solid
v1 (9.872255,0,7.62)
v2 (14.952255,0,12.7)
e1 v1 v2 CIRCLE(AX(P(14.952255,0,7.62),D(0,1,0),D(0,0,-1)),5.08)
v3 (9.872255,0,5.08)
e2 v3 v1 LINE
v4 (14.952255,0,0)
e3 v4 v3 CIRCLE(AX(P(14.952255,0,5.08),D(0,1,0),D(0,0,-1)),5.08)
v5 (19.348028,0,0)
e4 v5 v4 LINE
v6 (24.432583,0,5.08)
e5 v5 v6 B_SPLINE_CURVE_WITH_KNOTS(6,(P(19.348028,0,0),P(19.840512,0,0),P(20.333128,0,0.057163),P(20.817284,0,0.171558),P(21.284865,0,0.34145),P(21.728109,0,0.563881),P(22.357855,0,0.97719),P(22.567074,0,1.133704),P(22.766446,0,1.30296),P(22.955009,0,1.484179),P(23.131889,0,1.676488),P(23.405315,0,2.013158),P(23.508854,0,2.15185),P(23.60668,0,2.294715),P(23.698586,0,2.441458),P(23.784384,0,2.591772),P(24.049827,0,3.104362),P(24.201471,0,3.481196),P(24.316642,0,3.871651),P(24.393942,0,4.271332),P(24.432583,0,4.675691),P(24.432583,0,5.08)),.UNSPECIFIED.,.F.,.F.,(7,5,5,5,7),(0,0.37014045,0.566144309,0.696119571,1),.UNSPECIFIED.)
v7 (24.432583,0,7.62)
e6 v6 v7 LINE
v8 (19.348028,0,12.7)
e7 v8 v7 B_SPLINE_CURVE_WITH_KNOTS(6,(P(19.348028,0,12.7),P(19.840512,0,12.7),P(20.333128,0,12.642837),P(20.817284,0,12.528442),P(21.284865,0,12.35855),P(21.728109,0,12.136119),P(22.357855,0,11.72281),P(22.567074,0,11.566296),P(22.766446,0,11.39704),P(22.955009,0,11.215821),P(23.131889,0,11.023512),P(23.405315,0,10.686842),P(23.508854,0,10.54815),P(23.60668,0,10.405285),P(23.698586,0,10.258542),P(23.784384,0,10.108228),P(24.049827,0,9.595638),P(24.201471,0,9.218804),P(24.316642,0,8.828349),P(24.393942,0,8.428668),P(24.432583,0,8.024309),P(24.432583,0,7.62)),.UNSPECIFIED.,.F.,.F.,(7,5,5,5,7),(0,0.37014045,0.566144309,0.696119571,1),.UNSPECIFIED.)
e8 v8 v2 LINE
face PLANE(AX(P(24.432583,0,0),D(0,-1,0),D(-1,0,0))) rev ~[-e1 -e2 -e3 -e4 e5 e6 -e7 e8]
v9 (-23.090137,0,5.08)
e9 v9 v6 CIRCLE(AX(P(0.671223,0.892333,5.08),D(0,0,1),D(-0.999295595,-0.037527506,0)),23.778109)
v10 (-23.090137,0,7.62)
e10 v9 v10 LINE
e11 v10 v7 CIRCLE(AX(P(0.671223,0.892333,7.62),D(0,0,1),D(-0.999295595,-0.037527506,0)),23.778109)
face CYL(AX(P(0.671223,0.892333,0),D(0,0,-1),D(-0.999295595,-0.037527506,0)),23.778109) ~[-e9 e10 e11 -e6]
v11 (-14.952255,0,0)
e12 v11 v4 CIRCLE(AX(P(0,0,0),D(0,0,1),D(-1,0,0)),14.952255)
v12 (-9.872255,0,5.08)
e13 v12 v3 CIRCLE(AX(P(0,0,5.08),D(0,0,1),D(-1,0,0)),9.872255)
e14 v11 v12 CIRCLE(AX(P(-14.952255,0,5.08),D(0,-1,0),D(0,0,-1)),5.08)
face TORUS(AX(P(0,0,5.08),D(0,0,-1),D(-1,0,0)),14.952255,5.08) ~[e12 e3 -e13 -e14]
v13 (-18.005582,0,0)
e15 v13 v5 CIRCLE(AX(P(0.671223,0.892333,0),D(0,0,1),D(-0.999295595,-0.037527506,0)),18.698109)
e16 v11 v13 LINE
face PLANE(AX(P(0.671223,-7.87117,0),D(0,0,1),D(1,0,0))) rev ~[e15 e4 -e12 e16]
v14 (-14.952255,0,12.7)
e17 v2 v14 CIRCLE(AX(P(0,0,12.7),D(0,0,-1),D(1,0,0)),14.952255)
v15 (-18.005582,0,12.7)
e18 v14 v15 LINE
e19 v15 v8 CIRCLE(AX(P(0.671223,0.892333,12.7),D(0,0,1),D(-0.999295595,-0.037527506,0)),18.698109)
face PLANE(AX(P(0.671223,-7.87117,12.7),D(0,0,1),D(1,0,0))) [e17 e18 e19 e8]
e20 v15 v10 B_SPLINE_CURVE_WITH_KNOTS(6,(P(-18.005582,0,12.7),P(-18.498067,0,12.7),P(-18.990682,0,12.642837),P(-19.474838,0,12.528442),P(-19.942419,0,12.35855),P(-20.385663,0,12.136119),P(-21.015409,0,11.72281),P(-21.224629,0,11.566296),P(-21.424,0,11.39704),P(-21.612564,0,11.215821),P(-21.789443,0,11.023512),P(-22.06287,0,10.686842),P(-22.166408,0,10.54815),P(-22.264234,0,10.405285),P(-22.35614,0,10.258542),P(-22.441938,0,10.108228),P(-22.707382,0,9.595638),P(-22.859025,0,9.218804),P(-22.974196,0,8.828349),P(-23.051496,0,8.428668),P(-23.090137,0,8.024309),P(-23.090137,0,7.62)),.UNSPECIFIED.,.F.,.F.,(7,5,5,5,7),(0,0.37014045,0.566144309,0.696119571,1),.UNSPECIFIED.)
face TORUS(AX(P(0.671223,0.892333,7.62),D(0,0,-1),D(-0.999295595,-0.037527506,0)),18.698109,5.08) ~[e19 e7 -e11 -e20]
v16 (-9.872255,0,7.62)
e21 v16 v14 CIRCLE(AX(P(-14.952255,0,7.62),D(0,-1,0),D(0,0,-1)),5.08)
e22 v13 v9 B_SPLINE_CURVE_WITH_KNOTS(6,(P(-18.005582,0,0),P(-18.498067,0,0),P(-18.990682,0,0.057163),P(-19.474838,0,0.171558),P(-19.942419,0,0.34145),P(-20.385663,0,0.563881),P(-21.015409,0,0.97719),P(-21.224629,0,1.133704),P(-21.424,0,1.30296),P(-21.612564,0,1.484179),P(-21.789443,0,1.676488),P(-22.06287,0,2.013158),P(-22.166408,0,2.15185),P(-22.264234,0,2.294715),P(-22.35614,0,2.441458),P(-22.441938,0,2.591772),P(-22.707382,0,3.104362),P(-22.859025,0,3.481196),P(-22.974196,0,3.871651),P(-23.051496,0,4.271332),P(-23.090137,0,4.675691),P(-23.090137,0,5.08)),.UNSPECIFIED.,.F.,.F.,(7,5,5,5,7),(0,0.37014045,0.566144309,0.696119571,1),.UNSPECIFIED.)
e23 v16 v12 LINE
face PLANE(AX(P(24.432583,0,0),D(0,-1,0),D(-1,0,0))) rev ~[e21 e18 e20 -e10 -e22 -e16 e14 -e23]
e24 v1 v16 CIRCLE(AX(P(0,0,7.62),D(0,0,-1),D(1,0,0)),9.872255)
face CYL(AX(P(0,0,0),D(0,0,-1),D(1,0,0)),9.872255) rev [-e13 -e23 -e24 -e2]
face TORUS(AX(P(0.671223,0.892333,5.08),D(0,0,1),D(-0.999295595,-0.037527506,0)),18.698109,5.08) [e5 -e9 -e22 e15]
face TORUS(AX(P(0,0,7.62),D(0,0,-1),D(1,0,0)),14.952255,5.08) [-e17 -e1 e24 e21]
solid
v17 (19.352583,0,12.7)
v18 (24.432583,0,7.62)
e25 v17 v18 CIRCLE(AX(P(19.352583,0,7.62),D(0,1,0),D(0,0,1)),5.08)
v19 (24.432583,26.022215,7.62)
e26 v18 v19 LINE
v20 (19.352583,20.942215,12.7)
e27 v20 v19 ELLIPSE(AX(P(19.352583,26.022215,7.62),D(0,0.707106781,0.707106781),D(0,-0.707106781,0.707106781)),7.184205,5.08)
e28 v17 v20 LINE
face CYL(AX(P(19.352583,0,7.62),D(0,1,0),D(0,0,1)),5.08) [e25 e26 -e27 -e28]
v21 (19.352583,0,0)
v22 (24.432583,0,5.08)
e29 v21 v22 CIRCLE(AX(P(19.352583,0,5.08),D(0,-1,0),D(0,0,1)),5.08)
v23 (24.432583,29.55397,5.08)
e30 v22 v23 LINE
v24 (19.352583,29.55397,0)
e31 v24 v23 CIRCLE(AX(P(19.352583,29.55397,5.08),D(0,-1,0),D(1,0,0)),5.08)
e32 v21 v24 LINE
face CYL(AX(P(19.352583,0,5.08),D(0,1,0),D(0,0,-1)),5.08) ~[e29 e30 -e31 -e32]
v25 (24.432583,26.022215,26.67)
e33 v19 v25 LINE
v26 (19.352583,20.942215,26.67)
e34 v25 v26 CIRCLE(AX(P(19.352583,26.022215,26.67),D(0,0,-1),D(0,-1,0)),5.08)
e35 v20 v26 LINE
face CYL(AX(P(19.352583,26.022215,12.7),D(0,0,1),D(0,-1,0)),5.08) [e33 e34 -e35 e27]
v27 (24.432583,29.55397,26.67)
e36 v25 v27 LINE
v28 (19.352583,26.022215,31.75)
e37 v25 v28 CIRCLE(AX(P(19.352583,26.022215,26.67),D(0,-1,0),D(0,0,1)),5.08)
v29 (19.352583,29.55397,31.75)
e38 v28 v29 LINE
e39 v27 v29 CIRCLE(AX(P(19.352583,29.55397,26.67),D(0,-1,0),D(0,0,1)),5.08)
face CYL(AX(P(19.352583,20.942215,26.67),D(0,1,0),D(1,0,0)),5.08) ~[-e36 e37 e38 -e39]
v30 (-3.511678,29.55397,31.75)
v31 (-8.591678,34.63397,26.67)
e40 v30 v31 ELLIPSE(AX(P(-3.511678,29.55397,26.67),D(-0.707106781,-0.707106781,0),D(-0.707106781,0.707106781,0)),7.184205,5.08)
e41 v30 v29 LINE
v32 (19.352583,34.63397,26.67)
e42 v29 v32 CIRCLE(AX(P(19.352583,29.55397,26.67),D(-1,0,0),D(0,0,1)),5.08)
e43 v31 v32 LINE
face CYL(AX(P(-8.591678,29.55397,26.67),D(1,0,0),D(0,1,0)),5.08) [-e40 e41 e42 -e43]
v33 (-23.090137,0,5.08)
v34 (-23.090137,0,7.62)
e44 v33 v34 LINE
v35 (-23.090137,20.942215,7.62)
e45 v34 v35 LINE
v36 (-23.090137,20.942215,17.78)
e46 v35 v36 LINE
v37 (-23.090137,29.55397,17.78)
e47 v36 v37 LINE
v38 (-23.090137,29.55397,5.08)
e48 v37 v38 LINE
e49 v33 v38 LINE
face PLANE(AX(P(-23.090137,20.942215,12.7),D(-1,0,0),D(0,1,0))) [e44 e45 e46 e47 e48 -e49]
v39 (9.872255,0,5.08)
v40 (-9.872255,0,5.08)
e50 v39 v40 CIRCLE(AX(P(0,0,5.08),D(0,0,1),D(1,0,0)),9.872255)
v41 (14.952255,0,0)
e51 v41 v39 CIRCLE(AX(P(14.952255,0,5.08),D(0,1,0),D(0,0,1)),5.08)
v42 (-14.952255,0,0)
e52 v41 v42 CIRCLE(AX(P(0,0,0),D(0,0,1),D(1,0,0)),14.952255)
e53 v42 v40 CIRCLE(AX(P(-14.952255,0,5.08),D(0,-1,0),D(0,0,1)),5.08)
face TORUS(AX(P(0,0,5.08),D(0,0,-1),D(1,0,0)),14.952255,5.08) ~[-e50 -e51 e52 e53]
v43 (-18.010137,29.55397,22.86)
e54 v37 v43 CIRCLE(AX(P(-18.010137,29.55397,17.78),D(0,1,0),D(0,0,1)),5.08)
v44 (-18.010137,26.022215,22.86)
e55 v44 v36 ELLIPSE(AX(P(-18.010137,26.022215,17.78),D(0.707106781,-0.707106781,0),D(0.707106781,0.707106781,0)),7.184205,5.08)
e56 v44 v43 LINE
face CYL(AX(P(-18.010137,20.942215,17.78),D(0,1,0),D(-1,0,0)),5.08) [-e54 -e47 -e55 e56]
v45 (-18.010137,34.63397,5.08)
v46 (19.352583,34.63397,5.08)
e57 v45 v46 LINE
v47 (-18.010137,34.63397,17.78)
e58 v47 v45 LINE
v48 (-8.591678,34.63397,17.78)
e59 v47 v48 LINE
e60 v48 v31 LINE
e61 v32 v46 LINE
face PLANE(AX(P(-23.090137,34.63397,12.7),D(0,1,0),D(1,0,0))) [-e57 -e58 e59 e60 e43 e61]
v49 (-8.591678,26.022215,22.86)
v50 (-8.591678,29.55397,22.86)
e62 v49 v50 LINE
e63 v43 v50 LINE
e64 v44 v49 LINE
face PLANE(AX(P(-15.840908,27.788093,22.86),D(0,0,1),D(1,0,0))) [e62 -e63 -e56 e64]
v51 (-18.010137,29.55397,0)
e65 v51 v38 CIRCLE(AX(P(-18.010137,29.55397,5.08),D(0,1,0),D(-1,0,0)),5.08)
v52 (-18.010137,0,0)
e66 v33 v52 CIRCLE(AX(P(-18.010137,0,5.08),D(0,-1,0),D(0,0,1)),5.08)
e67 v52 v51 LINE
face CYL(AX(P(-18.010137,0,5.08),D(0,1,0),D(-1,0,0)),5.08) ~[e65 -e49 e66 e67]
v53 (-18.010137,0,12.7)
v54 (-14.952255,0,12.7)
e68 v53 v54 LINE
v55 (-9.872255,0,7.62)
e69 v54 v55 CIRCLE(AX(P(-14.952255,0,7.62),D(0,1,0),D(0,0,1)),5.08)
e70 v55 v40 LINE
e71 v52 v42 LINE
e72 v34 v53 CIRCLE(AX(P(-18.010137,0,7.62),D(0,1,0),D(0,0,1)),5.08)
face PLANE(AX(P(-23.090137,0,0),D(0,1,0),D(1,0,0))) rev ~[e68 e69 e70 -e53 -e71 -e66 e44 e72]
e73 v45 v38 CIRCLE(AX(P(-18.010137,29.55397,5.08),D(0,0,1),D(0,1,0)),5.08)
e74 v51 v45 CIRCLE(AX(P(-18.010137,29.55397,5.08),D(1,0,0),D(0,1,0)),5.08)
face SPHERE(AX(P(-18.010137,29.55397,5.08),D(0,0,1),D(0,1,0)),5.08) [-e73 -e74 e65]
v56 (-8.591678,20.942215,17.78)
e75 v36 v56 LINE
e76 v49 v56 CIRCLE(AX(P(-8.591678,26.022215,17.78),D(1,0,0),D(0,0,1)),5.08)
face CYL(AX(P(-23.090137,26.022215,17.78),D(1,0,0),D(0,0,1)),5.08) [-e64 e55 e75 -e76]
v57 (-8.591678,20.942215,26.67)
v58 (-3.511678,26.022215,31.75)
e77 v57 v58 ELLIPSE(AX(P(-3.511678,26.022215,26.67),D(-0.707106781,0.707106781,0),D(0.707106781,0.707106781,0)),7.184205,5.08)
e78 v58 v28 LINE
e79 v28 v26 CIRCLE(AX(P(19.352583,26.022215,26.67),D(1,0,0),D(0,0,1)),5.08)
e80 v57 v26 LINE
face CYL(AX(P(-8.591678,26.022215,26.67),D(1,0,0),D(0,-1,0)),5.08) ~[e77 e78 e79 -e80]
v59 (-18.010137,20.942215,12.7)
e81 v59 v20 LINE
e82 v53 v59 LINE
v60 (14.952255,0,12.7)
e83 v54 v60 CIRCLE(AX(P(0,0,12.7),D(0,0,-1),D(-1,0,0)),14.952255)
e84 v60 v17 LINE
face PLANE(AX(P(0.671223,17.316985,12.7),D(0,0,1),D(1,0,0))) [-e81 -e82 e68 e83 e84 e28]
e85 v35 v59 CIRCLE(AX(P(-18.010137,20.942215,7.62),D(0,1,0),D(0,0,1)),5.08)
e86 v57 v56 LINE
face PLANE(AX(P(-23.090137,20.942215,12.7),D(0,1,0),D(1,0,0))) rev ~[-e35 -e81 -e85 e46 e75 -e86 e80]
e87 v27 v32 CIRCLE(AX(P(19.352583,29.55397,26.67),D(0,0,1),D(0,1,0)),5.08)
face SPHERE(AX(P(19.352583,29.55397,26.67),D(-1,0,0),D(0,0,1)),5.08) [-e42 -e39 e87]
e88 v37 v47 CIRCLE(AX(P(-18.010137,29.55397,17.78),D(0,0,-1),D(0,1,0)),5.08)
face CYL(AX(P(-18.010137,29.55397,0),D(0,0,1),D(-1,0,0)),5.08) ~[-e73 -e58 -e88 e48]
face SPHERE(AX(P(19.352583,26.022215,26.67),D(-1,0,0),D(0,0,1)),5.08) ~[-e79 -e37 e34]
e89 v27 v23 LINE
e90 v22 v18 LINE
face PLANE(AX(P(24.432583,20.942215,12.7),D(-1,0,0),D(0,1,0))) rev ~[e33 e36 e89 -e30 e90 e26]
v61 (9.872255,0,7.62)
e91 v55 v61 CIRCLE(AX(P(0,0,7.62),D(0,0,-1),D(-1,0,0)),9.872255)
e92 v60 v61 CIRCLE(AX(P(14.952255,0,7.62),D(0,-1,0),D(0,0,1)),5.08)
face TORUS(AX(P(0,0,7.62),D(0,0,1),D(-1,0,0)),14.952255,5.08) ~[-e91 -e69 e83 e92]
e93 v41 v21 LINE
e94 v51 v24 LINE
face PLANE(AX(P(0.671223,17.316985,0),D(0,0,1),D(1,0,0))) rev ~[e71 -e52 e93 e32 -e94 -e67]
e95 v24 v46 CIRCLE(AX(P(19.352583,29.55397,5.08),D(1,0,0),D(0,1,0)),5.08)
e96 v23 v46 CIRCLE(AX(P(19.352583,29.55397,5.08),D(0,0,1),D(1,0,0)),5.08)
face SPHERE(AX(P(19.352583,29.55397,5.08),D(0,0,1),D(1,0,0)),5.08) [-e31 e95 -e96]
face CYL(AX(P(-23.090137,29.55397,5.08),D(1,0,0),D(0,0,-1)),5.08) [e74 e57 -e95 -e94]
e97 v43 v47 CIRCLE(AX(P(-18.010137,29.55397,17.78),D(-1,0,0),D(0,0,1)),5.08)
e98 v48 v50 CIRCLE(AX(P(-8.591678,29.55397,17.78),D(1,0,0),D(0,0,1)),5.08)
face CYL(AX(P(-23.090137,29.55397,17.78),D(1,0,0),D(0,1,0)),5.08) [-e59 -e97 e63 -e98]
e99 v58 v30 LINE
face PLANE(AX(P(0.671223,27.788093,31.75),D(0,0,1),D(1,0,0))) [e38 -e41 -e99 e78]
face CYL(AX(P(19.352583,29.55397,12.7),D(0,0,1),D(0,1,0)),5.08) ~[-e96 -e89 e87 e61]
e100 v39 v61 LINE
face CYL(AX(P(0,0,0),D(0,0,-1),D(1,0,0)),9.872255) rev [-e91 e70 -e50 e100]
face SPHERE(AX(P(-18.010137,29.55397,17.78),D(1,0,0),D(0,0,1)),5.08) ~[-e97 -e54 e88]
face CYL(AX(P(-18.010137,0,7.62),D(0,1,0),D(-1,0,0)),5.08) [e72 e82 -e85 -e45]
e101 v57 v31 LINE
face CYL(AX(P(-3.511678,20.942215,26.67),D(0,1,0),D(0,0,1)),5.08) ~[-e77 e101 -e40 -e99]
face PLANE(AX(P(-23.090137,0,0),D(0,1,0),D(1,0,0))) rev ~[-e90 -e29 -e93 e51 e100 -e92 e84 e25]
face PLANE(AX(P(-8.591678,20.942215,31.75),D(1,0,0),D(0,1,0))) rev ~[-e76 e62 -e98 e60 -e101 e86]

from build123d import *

# Parameters (mm, degrees)
F2_DEPTH = 12.7
F1_W     = 47.5227199495
F1_H     = 34.6339703538
F3_W     = 47.5227199495
F3_H     = 13.6917554773
F4_DEPTH = 19.05
F5_W     = 14.4984591752
F5_H     = 13.6917554773
F6_DEPTH = 8.89
F7_R     = 9.8722552071
F8_DEPTH = 31.751
F10_R    = 5.08
F10_2_R  = 5.08


# Not quite as in the source:
# - a feature of the source that left no trace in its solid (it failed there, or was rolled back) is left out


with BuildPart() as f2:
    # F0 (on Top) → F2 (new body)
    with BuildSketch(Plane.XY):
        with BuildLine():
            Line((24.4325827807, 0), (-23.0901371688, 0))
            ThreePointArc((-23.0901371688, 0), (0.671222806, -22.885776239), (24.4325827807, 0))
        make_face()
    extrude(amount=F2_DEPTH)


with BuildPart() as f2b:
    # F1 (on Top) → F2, piece 2 (new body)
    with BuildSketch(Plane.XY):
        with Locations((0.671222806, 17.3169851769)):
            Rectangle(F1_W, F1_H)
    extrude(amount=F2_DEPTH)

    # F3 (on face) → F4 (join)
    with BuildSketch(Plane.XY.offset(12.7)):
        with Locations((0.671222806, 27.7880926151)):
            Rectangle(F3_W, F3_H)
    extrude(amount=F4_DEPTH)

    # F5 (on face) → F6 (cut)
    with BuildSketch(Plane.XY.offset(31.75)):
        with Locations((-15.8409075812, 27.7880926151)):
            Rectangle(F5_W, F5_H)
    extrude(amount=-F6_DEPTH, mode=Mode.SUBTRACT)


with BuildPart() as f8_tool:
    # F7 (on Top) → F8 (new body, through all)
    with BuildSketch(Plane.XY):
        Circle(F7_R)
    extrude(amount=F8_DEPTH)


with BuildPart() as f2_1:
    add(f2.part)

    # F8: cut by f8_tool
    add(f8_tool.part, mode=Mode.SUBTRACT)

    # F10#2
    f10_2_edges = [f2_1.edges().sort_by_distance(p)[0] for p in [
        (0.671223, -22.885776, 0),
        (0, -9.872255, 0),
        (0, -9.872255, 12.7),
        (0.671223, -22.885776, 12.7),
    ]]
    fillet(f10_2_edges, radius=F10_2_R)


with BuildPart() as f2b_1:
    add(f2b.part)

    # F8: cut by f8_tool
    add(f8_tool.part, mode=Mode.SUBTRACT)

    # F10
    f10_edges = [f2b_1.edges().sort_by_distance(p)[0] for p in [
        (7.920452, 20.942215, 31.75),
        (-15.840908, 20.942215, 22.86),
        (-8.591678, 27.788093, 31.75),
        (7.920452, 34.63397, 31.75),
        (24.432583, 27.788093, 31.75),
        (-15.840908, 34.63397, 22.86),
        (-23.090137, 27.788093, 22.86),
        (-23.090137, 34.63397, 11.43),
        (24.432583, 34.63397, 15.875),
        (24.432583, 20.942215, 22.225),
        (24.432583, 10.471107, 12.7),
        (24.432583, 17.316985, 0),
        (0, 9.872255, 12.7),
        (-23.090137, 10.471107, 12.7),
        (0.671223, 34.63397, 0),
        (0, 9.872255, 0),
        (-23.090137, 17.316985, 0),
    ]]
    fillet(f10_edges, radius=F10_R)


solid = Compound([f2_1.part, f2b_1.part])
